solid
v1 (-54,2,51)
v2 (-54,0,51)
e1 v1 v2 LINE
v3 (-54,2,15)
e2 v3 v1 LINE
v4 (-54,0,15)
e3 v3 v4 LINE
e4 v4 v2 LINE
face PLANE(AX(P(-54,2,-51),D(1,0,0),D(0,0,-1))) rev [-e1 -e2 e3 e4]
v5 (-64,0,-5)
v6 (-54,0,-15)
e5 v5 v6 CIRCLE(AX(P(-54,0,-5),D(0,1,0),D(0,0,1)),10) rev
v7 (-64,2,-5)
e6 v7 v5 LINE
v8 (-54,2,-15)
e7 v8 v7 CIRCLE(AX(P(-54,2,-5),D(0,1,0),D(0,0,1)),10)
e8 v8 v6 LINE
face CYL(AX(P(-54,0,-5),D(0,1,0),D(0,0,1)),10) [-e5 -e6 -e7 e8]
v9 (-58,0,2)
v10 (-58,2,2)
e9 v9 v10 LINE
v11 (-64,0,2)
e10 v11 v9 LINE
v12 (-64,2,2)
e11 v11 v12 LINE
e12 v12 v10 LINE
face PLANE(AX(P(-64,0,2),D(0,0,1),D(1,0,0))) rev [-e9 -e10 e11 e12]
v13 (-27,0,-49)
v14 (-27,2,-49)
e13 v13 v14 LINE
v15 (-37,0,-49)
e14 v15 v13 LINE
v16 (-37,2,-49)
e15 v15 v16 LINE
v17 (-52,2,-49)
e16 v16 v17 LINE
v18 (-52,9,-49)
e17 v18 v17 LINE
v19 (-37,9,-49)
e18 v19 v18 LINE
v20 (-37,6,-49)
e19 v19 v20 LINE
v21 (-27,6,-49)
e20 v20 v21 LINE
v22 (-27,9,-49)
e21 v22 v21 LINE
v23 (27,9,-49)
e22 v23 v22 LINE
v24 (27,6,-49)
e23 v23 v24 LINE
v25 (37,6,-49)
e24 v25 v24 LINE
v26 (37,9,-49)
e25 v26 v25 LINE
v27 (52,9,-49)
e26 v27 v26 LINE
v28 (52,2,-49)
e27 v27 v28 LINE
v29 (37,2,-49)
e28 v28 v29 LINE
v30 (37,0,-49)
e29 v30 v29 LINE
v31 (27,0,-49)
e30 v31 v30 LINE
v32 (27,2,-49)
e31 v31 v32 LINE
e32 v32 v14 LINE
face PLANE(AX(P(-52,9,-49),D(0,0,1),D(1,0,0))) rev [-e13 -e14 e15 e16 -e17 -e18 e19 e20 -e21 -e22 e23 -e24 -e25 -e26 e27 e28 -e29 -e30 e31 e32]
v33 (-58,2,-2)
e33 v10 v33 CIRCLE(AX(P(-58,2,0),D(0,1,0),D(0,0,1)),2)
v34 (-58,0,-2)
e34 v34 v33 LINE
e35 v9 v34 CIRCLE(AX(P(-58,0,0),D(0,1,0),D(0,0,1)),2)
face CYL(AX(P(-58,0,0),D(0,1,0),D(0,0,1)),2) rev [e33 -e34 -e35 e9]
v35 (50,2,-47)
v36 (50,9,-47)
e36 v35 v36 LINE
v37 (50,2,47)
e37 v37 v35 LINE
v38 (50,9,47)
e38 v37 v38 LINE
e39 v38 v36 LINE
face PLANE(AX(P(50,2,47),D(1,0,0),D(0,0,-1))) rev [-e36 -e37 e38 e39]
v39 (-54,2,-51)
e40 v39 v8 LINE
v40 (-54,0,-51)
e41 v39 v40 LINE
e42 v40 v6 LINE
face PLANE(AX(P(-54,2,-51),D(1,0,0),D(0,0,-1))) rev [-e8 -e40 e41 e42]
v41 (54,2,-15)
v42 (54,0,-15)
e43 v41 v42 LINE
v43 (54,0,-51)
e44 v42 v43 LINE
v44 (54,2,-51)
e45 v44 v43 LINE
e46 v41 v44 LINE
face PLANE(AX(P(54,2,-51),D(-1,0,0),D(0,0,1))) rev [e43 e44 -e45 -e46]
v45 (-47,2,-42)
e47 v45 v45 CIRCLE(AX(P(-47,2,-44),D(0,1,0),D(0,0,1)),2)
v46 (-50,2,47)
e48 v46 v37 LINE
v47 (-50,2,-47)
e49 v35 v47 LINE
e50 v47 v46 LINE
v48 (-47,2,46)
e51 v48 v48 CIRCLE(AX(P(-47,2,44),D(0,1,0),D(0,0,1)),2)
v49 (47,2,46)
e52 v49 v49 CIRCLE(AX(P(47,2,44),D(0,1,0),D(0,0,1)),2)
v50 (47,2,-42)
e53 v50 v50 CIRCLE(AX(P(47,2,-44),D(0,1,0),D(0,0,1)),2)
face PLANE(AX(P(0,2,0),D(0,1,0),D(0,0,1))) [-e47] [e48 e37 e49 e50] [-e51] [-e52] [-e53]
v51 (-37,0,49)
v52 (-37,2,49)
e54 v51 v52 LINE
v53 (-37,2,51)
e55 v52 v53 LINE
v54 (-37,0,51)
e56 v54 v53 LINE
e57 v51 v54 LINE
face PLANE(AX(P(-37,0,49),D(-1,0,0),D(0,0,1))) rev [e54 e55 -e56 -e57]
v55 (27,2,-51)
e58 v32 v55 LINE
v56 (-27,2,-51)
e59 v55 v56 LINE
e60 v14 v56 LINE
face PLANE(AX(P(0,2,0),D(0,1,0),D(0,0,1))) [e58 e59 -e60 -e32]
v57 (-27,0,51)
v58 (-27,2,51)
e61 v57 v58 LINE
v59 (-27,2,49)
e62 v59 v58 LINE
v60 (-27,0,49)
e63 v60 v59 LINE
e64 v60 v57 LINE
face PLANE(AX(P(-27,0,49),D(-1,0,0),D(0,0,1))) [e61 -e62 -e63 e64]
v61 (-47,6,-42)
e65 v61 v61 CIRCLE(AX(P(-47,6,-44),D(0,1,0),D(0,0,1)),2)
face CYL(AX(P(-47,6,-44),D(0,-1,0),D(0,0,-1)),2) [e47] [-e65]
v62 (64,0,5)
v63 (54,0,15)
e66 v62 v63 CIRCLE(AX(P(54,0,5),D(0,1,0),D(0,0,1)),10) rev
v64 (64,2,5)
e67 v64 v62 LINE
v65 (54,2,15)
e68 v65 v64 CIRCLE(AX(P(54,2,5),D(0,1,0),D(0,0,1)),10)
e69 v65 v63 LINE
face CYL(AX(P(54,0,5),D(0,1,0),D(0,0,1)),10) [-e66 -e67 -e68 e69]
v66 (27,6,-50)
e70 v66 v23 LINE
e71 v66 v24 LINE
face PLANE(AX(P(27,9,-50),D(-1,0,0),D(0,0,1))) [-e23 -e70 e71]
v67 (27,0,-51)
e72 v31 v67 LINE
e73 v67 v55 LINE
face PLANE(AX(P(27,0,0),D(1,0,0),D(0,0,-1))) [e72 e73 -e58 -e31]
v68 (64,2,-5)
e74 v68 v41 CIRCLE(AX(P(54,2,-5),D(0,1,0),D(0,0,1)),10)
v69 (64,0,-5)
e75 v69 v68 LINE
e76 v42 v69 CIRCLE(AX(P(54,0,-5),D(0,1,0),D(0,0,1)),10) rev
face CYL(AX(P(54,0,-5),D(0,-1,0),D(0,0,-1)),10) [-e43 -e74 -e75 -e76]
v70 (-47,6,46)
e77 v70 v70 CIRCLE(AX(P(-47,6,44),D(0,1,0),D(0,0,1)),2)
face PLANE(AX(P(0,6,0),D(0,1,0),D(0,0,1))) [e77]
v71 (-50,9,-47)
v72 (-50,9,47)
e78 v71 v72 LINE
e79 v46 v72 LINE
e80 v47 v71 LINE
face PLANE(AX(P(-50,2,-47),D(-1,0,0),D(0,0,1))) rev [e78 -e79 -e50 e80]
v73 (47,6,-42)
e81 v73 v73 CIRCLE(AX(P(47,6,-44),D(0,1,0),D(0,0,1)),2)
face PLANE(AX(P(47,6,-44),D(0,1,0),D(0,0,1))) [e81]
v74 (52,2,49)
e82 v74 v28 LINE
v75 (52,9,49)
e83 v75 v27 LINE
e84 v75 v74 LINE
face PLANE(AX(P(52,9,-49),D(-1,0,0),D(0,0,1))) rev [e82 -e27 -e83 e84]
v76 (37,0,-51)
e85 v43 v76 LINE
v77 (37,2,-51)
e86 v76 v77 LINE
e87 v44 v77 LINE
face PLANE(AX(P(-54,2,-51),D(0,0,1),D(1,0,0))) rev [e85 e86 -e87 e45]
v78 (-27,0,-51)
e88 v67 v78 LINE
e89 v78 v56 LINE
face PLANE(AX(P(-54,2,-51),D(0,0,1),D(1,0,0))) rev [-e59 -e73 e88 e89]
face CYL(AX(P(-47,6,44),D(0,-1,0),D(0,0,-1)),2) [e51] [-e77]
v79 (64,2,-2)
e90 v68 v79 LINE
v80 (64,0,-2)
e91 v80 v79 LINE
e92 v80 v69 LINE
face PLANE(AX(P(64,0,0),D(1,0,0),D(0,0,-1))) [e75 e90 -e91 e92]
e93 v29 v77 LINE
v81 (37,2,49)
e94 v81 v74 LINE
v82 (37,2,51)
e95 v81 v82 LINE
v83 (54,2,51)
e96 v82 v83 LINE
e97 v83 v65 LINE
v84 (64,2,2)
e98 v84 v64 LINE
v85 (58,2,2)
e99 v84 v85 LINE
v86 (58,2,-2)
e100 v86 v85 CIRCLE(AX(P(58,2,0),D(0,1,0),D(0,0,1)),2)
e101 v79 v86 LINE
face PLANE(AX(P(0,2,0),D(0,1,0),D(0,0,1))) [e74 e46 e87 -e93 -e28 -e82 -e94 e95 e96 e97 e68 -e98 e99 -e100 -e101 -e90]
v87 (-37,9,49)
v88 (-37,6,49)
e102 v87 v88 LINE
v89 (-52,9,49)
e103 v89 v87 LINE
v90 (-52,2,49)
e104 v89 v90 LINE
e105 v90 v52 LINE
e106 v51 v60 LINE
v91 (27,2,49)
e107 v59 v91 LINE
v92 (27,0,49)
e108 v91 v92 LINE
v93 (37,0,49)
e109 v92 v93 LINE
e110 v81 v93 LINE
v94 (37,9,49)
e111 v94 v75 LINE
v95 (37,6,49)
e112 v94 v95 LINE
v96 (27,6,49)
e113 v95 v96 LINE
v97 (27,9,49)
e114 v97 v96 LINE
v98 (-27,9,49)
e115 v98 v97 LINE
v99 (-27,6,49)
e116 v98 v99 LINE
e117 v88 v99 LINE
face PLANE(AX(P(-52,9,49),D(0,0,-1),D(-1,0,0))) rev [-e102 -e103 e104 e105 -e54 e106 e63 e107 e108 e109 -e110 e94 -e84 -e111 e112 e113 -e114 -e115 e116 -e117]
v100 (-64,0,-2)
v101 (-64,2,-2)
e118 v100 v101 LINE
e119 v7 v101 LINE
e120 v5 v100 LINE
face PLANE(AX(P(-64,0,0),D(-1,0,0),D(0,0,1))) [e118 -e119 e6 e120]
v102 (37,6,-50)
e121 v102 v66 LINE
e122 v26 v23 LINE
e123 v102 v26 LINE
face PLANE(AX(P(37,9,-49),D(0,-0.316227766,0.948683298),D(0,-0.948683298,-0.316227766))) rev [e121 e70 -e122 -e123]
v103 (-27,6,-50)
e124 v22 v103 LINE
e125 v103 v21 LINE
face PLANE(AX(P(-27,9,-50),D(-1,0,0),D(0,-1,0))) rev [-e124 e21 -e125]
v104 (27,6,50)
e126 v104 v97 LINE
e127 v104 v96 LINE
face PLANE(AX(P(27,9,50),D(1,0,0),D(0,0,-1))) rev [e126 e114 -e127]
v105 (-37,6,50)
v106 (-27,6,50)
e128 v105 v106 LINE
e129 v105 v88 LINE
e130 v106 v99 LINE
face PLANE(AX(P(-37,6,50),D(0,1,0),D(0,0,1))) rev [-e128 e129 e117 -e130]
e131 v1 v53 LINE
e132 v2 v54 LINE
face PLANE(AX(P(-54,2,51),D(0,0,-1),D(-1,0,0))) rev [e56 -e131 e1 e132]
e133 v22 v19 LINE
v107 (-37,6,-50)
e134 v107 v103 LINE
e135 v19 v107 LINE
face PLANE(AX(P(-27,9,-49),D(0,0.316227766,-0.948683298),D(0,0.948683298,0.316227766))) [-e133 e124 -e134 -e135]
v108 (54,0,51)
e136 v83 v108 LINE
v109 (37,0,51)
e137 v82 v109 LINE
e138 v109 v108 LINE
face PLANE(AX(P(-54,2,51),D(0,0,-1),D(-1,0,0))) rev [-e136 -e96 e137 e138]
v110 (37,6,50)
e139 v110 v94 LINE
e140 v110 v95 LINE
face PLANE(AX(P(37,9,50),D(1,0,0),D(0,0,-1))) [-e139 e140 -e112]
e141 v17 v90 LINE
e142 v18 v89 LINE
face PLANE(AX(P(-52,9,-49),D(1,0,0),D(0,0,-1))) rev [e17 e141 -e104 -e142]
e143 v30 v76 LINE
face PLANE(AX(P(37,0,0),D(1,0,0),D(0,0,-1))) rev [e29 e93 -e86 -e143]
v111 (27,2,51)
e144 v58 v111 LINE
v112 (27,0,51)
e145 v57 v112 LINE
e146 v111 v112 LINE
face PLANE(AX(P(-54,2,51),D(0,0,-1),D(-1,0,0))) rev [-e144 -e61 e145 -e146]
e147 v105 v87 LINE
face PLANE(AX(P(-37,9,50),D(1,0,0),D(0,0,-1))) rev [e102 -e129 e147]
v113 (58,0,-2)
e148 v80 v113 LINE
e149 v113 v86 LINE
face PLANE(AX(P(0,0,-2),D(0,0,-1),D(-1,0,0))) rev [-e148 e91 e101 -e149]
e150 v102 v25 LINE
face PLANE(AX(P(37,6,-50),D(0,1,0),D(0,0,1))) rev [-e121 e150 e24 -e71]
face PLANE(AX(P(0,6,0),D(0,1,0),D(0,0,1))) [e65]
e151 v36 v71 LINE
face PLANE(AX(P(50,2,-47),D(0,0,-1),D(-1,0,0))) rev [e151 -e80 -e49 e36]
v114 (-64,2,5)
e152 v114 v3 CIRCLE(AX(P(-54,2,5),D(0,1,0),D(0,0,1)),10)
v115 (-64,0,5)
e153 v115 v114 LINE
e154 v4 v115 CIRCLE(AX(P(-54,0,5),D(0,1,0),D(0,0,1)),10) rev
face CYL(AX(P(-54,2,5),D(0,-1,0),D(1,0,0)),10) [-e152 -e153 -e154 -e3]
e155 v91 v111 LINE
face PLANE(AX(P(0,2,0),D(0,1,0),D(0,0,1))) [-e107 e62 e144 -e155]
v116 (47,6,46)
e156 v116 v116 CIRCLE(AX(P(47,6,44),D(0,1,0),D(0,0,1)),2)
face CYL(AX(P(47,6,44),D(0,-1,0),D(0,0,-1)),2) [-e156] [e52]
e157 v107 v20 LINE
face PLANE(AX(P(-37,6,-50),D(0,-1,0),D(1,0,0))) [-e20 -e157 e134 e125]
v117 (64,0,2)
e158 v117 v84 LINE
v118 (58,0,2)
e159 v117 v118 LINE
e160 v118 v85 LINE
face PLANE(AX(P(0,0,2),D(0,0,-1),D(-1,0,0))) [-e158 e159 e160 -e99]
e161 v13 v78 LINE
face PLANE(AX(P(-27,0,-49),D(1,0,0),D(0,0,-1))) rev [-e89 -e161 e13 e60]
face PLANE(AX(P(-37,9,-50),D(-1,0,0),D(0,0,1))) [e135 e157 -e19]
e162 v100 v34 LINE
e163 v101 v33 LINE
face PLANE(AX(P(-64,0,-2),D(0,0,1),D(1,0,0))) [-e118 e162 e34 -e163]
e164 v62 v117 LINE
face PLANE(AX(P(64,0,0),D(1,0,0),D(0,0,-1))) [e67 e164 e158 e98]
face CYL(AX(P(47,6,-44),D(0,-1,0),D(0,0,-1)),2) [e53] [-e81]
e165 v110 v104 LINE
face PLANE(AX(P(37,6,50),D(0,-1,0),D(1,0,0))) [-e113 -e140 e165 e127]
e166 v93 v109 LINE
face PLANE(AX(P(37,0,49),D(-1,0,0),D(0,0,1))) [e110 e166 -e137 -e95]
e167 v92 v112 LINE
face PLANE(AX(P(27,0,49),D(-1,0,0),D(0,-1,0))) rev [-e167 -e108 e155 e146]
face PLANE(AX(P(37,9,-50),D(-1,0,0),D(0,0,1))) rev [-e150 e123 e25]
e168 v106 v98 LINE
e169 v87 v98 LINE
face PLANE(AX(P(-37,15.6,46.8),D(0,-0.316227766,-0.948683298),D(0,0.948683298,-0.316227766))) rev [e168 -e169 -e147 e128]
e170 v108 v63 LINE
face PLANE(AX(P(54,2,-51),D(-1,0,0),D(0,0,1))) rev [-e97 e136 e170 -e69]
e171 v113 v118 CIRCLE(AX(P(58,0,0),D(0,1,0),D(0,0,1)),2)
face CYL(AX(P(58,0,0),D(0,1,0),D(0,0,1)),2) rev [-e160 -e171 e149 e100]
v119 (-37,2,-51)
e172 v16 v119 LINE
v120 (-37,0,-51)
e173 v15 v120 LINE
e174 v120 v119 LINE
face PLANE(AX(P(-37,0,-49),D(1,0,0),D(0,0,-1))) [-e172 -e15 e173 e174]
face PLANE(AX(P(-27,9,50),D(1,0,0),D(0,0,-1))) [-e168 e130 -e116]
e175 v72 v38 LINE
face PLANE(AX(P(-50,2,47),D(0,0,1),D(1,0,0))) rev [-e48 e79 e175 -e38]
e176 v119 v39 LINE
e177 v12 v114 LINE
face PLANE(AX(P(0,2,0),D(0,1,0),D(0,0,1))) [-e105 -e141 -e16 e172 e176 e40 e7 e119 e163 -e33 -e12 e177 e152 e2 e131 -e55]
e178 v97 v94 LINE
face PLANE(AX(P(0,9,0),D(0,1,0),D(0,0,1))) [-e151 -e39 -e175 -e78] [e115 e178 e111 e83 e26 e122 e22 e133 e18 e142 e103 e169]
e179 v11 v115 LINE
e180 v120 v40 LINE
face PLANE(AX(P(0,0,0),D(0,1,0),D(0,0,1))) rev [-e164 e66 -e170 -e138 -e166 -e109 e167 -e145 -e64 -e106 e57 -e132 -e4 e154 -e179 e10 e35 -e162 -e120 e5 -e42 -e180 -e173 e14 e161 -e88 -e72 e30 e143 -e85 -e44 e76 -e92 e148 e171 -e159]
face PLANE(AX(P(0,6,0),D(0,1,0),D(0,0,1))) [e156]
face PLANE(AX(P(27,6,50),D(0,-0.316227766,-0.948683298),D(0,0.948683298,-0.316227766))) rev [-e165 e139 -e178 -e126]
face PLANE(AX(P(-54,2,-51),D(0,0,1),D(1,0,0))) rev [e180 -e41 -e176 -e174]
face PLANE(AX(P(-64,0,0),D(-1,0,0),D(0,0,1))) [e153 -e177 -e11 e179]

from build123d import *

# Parameters (mm, degrees)
SKETCH1_W            = 108
SKETCH1_H            = 102
BOSS_EXTRUDE1_DEPTH  = 2
SKETCH2_W            = 104
SKETCH2_H            = 98
BOSS_EXTRUDE2_DEPTH  = 7
SKETCH3_W            = 100
SKETCH3_H            = 94
CUT_EXTRUDE1_DEPTH   = 7
SKETCH4_W            = 10
SKETCH4_H            = 3
BOSS_EXTRUDE6_DEPTH  = 1
CUT_EXTRUDE2_DEPTH   = 10
SKETCH6_W            = 10
SKETCH6_H            = 3
BOSS_EXTRUDE7_DEPTH  = 1
CUT_EXTRUDE3_DEPTH   = 10
SKETCH9_W            = 10
SKETCH9_H            = 3
BOSS_EXTRUDE9_DEPTH  = 1
CUT_EXTRUDE4_DEPTH   = 10
SKETCH11_W           = 10
SKETCH11_H           = 3
BOSS_EXTRUDE10_DEPTH = 1
CUT_EXTRUDE5_DEPTH   = 10
SKETCH20_W           = 10
SKETCH20_H           = 2
CUT_EXTRUDE7_DEPTH   = 2
SKETCH21_W           = 10
SKETCH21_H           = 2
CUT_EXTRUDE8_DEPTH   = 2
SKETCH22_W           = 10
SKETCH22_H           = 2
CUT_EXTRUDE9_DEPTH   = 2
SKETCH23_W           = 10
SKETCH23_H           = 2
CUT_EXTRUDE11_DEPTH  = 2
SKETCH24_R           = 2
BOSS_EXTRUDE11_DEPTH = 4
BOSS_EXTRUDE12_DEPTH = 4
BOSS_EXTRUDE13_DEPTH = 4
BOSS_EXTRUDE14_DEPTH = 4
SKETCH28_W           = 30
SKETCH28_H           = 2
BOSS_EXTRUDE15_DEPTH = 10
SKETCH29_R           = 2
SKETCH29_W           = 6
SKETCH29_H           = 4
CUT_EXTRUDE12_DEPTH  = 2
FILLET1_R            = 10
SKETCH30_W           = 30
SKETCH30_H           = 1
BOSS_EXTRUDE16_DEPTH = 10
CUT_EXTRUDE13_DEPTH  = 2
FILLET2_R            = 10


with BuildPart() as part:
    # Sketch1 → Boss-Extrude1 (new body)
    with BuildSketch(Plane(origin=(0, 0, 0), x_dir=(1, 0, 0), z_dir=(0, 1, 0))):
        Rectangle(SKETCH1_W, SKETCH1_H)
    extrude(amount=BOSS_EXTRUDE1_DEPTH)

    # Sketch2 → Boss-Extrude2 (add)
    with BuildSketch(Plane(origin=(0, 2, 0), x_dir=(1, 0, 0), z_dir=(0, 1, 0))):
        Rectangle(SKETCH2_W, SKETCH2_H)
    extrude(amount=BOSS_EXTRUDE2_DEPTH)

    # Sketch3 → Cut-Extrude1 (cut)
    with BuildSketch(Plane(origin=(0, 9, 0), x_dir=(1, 0, 0), z_dir=(0, 1, 0))):
        Rectangle(SKETCH3_W, SKETCH3_H)
    extrude(amount=-CUT_EXTRUDE1_DEPTH, mode=Mode.SUBTRACT)

    # Sketch4 → Boss-Extrude6 (add)
    with BuildSketch(Plane.XY.offset(49)):
        with Locations((-32, 7.5)):
            Rectangle(SKETCH4_W, SKETCH4_H)
    extrude(amount=BOSS_EXTRUDE6_DEPTH)

    # Sketch5 → Cut-Extrude2 (cut)
    with BuildSketch(Plane(origin=(-27, 0, 0), x_dir=(0, 0, -1), z_dir=(1, 0, 0))):
        Polygon((-50, 6), (-49, 9), (-50, 9), align=None)
    extrude(amount=-CUT_EXTRUDE2_DEPTH, mode=Mode.SUBTRACT)

    # Sketch6 → Boss-Extrude7 (add)
    with BuildSketch(Plane.XY.offset(49)):
        with Locations((32, 7.5)):
            Rectangle(SKETCH6_W, SKETCH6_H)
    extrude(amount=BOSS_EXTRUDE7_DEPTH)

    # Sketch7 → Cut-Extrude3 (cut)
    with BuildSketch(Plane(origin=(37, 0, 0), x_dir=(0, 0, -1), z_dir=(1, 0, 0))):
        Polygon((-50, 6), (-49, 9), (-50, 9), align=None)
    extrude(amount=-CUT_EXTRUDE3_DEPTH, mode=Mode.SUBTRACT)

    # Sketch9 → Boss-Extrude9 (add)
    with BuildSketch(Plane(origin=(0, 0, -49), x_dir=(-1, 0, 0), z_dir=(0, 0, -1))):
        with Locations((-32, 7.5)):
            Rectangle(SKETCH9_W, SKETCH9_H)
    extrude(amount=BOSS_EXTRUDE9_DEPTH)

    # Sketch10 → Cut-Extrude4 (cut)
    with BuildSketch(Plane.ZY.offset(-27)):
        Polygon((-49, 9), (-50, 6), (-50, 9), align=None)
    extrude(amount=-CUT_EXTRUDE4_DEPTH, mode=Mode.SUBTRACT)

    # Sketch11 → Boss-Extrude10 (add)
    with BuildSketch(Plane(origin=(0, 0, -49), x_dir=(-1, 0, 0), z_dir=(0, 0, -1))):
        with Locations((32, 7.5)):
            Rectangle(SKETCH11_W, SKETCH11_H)
    extrude(amount=BOSS_EXTRUDE10_DEPTH)

    # Sketch12 → Cut-Extrude5 (cut)
    with BuildSketch(Plane.ZY.offset(37)):
        Polygon((-49, 9), (-50, 6), (-50, 9), align=None)
    extrude(amount=-CUT_EXTRUDE5_DEPTH, mode=Mode.SUBTRACT)

    # Sketch20 → Cut-Extrude7 (cut)
    with BuildSketch(Plane.XY.offset(51)):
        with Locations((32, 1)):
            Rectangle(SKETCH20_W, SKETCH20_H)
    extrude(amount=-CUT_EXTRUDE7_DEPTH, mode=Mode.SUBTRACT)

    # Sketch21 → Cut-Extrude8 (cut)
    with BuildSketch(Plane(origin=(0, 2, 0), x_dir=(1, 0, 0), z_dir=(0, 1, 0))):
        with Locations((-32, -50)):
            Rectangle(SKETCH21_W, SKETCH21_H)
    extrude(amount=-CUT_EXTRUDE8_DEPTH, mode=Mode.SUBTRACT)

    # Sketch22 → Cut-Extrude9 (cut)
    with BuildSketch(Plane(origin=(0, 2, 0), x_dir=(1, 0, 0), z_dir=(0, 1, 0))):
        with Locations((32, 50)):
            Rectangle(SKETCH22_W, SKETCH22_H)
    extrude(amount=-CUT_EXTRUDE9_DEPTH, mode=Mode.SUBTRACT)

    # Sketch23 → Cut-Extrude11 (cut)
    with BuildSketch(Plane(origin=(0, 2, 0), x_dir=(1, 0, 0), z_dir=(0, 1, 0))):
        with Locations((-32, 50)):
            Rectangle(SKETCH23_W, SKETCH23_H)
    extrude(amount=-CUT_EXTRUDE11_DEPTH, mode=Mode.SUBTRACT)

    # Sketch24 → Boss-Extrude11 (add)
    with BuildSketch(Plane(origin=(0, 2, 0), x_dir=(1, 0, 0), z_dir=(0, 1, 0))):
        with Locations(Location((47, 44, 0), (0, 0, 270))):
            Circle(SKETCH24_R)
    extrude(amount=BOSS_EXTRUDE11_DEPTH)

    # Sketch25 → Boss-Extrude12 (add)
    with BuildSketch(Plane(origin=(0, 2, 0), x_dir=(1, 0, 0), z_dir=(0, 1, 0))):
        with BuildLine():
            ThreePointArc((-45, 44), (-45.585786438, 45.414213562), (-47, 46))
            Line((-47, 46), (-47, 44))
            Line((-47, 44), (-49, 44))
            ThreePointArc((-49, 44), (-47, 42), (-45, 44))
        make_face()
        with BuildLine():
            Line((-47, 44), (-47, 46))
            ThreePointArc((-47, 46), (-48.414213562, 45.414213562), (-49, 44))
            Line((-49, 44), (-47, 44))
        make_face()
    extrude(amount=BOSS_EXTRUDE12_DEPTH)

    # Sketch26 → Boss-Extrude13 (add)
    with BuildSketch(Plane(origin=(0, 2, 0), x_dir=(1, 0, 0), z_dir=(0, 1, 0))):
        with BuildLine():
            ThreePointArc((-49, -44), (-48.414213562, -45.414213562), (-47, -46))
            Line((-47, -46), (-47, -44))
            Line((-47, -44), (-49, -44))
        make_face()
        with BuildLine():
            Line((-47, -44), (-47, -46))
            ThreePointArc((-47, -46), (-45.585786438, -45.414213562), (-45, -44))
            ThreePointArc((-45, -44), (-47, -42), (-49, -44))
            Line((-49, -44), (-47, -44))
        make_face()
    extrude(amount=BOSS_EXTRUDE13_DEPTH)

    # Sketch27 → Boss-Extrude14 (add)
    with BuildSketch(Plane(origin=(0, 2, 0), x_dir=(1, 0, 0), z_dir=(0, 1, 0))):
        with BuildLine():
            ThreePointArc((49, -44), (45.585786438, -42.585786438), (47, -46))
            Line((47, -46), (47, -44))
            Line((47, -44), (49, -44))
        make_face()
        with BuildLine():
            Line((47, -44), (47, -46))
            ThreePointArc((47, -46), (48.414213562, -45.414213562), (49, -44))
            Line((49, -44), (47, -44))
        make_face()
    extrude(amount=BOSS_EXTRUDE14_DEPTH)

    # Sketch28 → Boss-Extrude15 (add)
    with BuildSketch(Plane.ZY.offset(54)):
        with Locations((0, 1)):
            Rectangle(SKETCH28_W, SKETCH28_H)
    extrude(amount=BOSS_EXTRUDE15_DEPTH)

    # Sketch29 → Cut-Extrude12 (cut)
    with BuildSketch(Plane(origin=(0, 2, 0), x_dir=(1, 0, 0), z_dir=(0, 1, 0))):
        with Locations((-58, 0)):
            Circle(SKETCH29_R)
        with Locations((-61, 0)):
            Rectangle(SKETCH29_W, SKETCH29_H)
    extrude(amount=-CUT_EXTRUDE12_DEPTH, mode=Mode.SUBTRACT)

    # Fillet1
    fillet1_edges = [part.edges().sort_by_distance(p)[0] for p in [
        (-64, 1, 15),
        (-64, 1, -15),
    ]]
    fillet(fillet1_edges, radius=FILLET1_R - 0.0001)  # a hair under: the kernel refuses the full size

    # Sketch30 → Boss-Extrude16 (add)
    with BuildSketch(Plane(origin=(54, 0, 0), x_dir=(0, 0, -1), z_dir=(1, 0, 0))):
        with Locations((0, 1.5)):
            Rectangle(SKETCH30_W, SKETCH30_H)
        with Locations((0, 0.5)):
            Rectangle(SKETCH30_W, SKETCH30_H)
    extrude(amount=BOSS_EXTRUDE16_DEPTH)

    # Sketch32 → Cut-Extrude13 (cut)
    with BuildSketch(Plane(origin=(0, 2, 0), x_dir=(1, 0, 0), z_dir=(0, 1, 0))):
        with BuildLine():
            Line((58, -2), (64, -2))
            Line((64, -2), (64, 2))
            Line((64, 2), (58, 2))
            ThreePointArc((58, 2), (59.414213562, 1.414213562), (60, 0))
            ThreePointArc((60, 0), (59.414213562, -1.414213562), (58, -2))
        make_face()
        with BuildLine():
            ThreePointArc((58, 2), (56, 0), (58, -2))
            Line((58, -2), (58, 2))
        make_face()
        with BuildLine():
            Line((58, 2), (58, -2))
            ThreePointArc((58, -2), (59.414213562, -1.414213562), (60, 0))
            ThreePointArc((60, 0), (59.414213562, 1.414213562), (58, 2))
        make_face()
    extrude(amount=-CUT_EXTRUDE13_DEPTH, mode=Mode.SUBTRACT)

    # Fillet2
    fillet2_edges = [part.edges().sort_by_distance(p)[0] for p in [
        (64, 1, -15),
        (64, 1, 15),
    ]]
    fillet(fillet2_edges, radius=FILLET2_R - 0.0001)  # a hair under: the kernel refuses the full size


solid = part.part
